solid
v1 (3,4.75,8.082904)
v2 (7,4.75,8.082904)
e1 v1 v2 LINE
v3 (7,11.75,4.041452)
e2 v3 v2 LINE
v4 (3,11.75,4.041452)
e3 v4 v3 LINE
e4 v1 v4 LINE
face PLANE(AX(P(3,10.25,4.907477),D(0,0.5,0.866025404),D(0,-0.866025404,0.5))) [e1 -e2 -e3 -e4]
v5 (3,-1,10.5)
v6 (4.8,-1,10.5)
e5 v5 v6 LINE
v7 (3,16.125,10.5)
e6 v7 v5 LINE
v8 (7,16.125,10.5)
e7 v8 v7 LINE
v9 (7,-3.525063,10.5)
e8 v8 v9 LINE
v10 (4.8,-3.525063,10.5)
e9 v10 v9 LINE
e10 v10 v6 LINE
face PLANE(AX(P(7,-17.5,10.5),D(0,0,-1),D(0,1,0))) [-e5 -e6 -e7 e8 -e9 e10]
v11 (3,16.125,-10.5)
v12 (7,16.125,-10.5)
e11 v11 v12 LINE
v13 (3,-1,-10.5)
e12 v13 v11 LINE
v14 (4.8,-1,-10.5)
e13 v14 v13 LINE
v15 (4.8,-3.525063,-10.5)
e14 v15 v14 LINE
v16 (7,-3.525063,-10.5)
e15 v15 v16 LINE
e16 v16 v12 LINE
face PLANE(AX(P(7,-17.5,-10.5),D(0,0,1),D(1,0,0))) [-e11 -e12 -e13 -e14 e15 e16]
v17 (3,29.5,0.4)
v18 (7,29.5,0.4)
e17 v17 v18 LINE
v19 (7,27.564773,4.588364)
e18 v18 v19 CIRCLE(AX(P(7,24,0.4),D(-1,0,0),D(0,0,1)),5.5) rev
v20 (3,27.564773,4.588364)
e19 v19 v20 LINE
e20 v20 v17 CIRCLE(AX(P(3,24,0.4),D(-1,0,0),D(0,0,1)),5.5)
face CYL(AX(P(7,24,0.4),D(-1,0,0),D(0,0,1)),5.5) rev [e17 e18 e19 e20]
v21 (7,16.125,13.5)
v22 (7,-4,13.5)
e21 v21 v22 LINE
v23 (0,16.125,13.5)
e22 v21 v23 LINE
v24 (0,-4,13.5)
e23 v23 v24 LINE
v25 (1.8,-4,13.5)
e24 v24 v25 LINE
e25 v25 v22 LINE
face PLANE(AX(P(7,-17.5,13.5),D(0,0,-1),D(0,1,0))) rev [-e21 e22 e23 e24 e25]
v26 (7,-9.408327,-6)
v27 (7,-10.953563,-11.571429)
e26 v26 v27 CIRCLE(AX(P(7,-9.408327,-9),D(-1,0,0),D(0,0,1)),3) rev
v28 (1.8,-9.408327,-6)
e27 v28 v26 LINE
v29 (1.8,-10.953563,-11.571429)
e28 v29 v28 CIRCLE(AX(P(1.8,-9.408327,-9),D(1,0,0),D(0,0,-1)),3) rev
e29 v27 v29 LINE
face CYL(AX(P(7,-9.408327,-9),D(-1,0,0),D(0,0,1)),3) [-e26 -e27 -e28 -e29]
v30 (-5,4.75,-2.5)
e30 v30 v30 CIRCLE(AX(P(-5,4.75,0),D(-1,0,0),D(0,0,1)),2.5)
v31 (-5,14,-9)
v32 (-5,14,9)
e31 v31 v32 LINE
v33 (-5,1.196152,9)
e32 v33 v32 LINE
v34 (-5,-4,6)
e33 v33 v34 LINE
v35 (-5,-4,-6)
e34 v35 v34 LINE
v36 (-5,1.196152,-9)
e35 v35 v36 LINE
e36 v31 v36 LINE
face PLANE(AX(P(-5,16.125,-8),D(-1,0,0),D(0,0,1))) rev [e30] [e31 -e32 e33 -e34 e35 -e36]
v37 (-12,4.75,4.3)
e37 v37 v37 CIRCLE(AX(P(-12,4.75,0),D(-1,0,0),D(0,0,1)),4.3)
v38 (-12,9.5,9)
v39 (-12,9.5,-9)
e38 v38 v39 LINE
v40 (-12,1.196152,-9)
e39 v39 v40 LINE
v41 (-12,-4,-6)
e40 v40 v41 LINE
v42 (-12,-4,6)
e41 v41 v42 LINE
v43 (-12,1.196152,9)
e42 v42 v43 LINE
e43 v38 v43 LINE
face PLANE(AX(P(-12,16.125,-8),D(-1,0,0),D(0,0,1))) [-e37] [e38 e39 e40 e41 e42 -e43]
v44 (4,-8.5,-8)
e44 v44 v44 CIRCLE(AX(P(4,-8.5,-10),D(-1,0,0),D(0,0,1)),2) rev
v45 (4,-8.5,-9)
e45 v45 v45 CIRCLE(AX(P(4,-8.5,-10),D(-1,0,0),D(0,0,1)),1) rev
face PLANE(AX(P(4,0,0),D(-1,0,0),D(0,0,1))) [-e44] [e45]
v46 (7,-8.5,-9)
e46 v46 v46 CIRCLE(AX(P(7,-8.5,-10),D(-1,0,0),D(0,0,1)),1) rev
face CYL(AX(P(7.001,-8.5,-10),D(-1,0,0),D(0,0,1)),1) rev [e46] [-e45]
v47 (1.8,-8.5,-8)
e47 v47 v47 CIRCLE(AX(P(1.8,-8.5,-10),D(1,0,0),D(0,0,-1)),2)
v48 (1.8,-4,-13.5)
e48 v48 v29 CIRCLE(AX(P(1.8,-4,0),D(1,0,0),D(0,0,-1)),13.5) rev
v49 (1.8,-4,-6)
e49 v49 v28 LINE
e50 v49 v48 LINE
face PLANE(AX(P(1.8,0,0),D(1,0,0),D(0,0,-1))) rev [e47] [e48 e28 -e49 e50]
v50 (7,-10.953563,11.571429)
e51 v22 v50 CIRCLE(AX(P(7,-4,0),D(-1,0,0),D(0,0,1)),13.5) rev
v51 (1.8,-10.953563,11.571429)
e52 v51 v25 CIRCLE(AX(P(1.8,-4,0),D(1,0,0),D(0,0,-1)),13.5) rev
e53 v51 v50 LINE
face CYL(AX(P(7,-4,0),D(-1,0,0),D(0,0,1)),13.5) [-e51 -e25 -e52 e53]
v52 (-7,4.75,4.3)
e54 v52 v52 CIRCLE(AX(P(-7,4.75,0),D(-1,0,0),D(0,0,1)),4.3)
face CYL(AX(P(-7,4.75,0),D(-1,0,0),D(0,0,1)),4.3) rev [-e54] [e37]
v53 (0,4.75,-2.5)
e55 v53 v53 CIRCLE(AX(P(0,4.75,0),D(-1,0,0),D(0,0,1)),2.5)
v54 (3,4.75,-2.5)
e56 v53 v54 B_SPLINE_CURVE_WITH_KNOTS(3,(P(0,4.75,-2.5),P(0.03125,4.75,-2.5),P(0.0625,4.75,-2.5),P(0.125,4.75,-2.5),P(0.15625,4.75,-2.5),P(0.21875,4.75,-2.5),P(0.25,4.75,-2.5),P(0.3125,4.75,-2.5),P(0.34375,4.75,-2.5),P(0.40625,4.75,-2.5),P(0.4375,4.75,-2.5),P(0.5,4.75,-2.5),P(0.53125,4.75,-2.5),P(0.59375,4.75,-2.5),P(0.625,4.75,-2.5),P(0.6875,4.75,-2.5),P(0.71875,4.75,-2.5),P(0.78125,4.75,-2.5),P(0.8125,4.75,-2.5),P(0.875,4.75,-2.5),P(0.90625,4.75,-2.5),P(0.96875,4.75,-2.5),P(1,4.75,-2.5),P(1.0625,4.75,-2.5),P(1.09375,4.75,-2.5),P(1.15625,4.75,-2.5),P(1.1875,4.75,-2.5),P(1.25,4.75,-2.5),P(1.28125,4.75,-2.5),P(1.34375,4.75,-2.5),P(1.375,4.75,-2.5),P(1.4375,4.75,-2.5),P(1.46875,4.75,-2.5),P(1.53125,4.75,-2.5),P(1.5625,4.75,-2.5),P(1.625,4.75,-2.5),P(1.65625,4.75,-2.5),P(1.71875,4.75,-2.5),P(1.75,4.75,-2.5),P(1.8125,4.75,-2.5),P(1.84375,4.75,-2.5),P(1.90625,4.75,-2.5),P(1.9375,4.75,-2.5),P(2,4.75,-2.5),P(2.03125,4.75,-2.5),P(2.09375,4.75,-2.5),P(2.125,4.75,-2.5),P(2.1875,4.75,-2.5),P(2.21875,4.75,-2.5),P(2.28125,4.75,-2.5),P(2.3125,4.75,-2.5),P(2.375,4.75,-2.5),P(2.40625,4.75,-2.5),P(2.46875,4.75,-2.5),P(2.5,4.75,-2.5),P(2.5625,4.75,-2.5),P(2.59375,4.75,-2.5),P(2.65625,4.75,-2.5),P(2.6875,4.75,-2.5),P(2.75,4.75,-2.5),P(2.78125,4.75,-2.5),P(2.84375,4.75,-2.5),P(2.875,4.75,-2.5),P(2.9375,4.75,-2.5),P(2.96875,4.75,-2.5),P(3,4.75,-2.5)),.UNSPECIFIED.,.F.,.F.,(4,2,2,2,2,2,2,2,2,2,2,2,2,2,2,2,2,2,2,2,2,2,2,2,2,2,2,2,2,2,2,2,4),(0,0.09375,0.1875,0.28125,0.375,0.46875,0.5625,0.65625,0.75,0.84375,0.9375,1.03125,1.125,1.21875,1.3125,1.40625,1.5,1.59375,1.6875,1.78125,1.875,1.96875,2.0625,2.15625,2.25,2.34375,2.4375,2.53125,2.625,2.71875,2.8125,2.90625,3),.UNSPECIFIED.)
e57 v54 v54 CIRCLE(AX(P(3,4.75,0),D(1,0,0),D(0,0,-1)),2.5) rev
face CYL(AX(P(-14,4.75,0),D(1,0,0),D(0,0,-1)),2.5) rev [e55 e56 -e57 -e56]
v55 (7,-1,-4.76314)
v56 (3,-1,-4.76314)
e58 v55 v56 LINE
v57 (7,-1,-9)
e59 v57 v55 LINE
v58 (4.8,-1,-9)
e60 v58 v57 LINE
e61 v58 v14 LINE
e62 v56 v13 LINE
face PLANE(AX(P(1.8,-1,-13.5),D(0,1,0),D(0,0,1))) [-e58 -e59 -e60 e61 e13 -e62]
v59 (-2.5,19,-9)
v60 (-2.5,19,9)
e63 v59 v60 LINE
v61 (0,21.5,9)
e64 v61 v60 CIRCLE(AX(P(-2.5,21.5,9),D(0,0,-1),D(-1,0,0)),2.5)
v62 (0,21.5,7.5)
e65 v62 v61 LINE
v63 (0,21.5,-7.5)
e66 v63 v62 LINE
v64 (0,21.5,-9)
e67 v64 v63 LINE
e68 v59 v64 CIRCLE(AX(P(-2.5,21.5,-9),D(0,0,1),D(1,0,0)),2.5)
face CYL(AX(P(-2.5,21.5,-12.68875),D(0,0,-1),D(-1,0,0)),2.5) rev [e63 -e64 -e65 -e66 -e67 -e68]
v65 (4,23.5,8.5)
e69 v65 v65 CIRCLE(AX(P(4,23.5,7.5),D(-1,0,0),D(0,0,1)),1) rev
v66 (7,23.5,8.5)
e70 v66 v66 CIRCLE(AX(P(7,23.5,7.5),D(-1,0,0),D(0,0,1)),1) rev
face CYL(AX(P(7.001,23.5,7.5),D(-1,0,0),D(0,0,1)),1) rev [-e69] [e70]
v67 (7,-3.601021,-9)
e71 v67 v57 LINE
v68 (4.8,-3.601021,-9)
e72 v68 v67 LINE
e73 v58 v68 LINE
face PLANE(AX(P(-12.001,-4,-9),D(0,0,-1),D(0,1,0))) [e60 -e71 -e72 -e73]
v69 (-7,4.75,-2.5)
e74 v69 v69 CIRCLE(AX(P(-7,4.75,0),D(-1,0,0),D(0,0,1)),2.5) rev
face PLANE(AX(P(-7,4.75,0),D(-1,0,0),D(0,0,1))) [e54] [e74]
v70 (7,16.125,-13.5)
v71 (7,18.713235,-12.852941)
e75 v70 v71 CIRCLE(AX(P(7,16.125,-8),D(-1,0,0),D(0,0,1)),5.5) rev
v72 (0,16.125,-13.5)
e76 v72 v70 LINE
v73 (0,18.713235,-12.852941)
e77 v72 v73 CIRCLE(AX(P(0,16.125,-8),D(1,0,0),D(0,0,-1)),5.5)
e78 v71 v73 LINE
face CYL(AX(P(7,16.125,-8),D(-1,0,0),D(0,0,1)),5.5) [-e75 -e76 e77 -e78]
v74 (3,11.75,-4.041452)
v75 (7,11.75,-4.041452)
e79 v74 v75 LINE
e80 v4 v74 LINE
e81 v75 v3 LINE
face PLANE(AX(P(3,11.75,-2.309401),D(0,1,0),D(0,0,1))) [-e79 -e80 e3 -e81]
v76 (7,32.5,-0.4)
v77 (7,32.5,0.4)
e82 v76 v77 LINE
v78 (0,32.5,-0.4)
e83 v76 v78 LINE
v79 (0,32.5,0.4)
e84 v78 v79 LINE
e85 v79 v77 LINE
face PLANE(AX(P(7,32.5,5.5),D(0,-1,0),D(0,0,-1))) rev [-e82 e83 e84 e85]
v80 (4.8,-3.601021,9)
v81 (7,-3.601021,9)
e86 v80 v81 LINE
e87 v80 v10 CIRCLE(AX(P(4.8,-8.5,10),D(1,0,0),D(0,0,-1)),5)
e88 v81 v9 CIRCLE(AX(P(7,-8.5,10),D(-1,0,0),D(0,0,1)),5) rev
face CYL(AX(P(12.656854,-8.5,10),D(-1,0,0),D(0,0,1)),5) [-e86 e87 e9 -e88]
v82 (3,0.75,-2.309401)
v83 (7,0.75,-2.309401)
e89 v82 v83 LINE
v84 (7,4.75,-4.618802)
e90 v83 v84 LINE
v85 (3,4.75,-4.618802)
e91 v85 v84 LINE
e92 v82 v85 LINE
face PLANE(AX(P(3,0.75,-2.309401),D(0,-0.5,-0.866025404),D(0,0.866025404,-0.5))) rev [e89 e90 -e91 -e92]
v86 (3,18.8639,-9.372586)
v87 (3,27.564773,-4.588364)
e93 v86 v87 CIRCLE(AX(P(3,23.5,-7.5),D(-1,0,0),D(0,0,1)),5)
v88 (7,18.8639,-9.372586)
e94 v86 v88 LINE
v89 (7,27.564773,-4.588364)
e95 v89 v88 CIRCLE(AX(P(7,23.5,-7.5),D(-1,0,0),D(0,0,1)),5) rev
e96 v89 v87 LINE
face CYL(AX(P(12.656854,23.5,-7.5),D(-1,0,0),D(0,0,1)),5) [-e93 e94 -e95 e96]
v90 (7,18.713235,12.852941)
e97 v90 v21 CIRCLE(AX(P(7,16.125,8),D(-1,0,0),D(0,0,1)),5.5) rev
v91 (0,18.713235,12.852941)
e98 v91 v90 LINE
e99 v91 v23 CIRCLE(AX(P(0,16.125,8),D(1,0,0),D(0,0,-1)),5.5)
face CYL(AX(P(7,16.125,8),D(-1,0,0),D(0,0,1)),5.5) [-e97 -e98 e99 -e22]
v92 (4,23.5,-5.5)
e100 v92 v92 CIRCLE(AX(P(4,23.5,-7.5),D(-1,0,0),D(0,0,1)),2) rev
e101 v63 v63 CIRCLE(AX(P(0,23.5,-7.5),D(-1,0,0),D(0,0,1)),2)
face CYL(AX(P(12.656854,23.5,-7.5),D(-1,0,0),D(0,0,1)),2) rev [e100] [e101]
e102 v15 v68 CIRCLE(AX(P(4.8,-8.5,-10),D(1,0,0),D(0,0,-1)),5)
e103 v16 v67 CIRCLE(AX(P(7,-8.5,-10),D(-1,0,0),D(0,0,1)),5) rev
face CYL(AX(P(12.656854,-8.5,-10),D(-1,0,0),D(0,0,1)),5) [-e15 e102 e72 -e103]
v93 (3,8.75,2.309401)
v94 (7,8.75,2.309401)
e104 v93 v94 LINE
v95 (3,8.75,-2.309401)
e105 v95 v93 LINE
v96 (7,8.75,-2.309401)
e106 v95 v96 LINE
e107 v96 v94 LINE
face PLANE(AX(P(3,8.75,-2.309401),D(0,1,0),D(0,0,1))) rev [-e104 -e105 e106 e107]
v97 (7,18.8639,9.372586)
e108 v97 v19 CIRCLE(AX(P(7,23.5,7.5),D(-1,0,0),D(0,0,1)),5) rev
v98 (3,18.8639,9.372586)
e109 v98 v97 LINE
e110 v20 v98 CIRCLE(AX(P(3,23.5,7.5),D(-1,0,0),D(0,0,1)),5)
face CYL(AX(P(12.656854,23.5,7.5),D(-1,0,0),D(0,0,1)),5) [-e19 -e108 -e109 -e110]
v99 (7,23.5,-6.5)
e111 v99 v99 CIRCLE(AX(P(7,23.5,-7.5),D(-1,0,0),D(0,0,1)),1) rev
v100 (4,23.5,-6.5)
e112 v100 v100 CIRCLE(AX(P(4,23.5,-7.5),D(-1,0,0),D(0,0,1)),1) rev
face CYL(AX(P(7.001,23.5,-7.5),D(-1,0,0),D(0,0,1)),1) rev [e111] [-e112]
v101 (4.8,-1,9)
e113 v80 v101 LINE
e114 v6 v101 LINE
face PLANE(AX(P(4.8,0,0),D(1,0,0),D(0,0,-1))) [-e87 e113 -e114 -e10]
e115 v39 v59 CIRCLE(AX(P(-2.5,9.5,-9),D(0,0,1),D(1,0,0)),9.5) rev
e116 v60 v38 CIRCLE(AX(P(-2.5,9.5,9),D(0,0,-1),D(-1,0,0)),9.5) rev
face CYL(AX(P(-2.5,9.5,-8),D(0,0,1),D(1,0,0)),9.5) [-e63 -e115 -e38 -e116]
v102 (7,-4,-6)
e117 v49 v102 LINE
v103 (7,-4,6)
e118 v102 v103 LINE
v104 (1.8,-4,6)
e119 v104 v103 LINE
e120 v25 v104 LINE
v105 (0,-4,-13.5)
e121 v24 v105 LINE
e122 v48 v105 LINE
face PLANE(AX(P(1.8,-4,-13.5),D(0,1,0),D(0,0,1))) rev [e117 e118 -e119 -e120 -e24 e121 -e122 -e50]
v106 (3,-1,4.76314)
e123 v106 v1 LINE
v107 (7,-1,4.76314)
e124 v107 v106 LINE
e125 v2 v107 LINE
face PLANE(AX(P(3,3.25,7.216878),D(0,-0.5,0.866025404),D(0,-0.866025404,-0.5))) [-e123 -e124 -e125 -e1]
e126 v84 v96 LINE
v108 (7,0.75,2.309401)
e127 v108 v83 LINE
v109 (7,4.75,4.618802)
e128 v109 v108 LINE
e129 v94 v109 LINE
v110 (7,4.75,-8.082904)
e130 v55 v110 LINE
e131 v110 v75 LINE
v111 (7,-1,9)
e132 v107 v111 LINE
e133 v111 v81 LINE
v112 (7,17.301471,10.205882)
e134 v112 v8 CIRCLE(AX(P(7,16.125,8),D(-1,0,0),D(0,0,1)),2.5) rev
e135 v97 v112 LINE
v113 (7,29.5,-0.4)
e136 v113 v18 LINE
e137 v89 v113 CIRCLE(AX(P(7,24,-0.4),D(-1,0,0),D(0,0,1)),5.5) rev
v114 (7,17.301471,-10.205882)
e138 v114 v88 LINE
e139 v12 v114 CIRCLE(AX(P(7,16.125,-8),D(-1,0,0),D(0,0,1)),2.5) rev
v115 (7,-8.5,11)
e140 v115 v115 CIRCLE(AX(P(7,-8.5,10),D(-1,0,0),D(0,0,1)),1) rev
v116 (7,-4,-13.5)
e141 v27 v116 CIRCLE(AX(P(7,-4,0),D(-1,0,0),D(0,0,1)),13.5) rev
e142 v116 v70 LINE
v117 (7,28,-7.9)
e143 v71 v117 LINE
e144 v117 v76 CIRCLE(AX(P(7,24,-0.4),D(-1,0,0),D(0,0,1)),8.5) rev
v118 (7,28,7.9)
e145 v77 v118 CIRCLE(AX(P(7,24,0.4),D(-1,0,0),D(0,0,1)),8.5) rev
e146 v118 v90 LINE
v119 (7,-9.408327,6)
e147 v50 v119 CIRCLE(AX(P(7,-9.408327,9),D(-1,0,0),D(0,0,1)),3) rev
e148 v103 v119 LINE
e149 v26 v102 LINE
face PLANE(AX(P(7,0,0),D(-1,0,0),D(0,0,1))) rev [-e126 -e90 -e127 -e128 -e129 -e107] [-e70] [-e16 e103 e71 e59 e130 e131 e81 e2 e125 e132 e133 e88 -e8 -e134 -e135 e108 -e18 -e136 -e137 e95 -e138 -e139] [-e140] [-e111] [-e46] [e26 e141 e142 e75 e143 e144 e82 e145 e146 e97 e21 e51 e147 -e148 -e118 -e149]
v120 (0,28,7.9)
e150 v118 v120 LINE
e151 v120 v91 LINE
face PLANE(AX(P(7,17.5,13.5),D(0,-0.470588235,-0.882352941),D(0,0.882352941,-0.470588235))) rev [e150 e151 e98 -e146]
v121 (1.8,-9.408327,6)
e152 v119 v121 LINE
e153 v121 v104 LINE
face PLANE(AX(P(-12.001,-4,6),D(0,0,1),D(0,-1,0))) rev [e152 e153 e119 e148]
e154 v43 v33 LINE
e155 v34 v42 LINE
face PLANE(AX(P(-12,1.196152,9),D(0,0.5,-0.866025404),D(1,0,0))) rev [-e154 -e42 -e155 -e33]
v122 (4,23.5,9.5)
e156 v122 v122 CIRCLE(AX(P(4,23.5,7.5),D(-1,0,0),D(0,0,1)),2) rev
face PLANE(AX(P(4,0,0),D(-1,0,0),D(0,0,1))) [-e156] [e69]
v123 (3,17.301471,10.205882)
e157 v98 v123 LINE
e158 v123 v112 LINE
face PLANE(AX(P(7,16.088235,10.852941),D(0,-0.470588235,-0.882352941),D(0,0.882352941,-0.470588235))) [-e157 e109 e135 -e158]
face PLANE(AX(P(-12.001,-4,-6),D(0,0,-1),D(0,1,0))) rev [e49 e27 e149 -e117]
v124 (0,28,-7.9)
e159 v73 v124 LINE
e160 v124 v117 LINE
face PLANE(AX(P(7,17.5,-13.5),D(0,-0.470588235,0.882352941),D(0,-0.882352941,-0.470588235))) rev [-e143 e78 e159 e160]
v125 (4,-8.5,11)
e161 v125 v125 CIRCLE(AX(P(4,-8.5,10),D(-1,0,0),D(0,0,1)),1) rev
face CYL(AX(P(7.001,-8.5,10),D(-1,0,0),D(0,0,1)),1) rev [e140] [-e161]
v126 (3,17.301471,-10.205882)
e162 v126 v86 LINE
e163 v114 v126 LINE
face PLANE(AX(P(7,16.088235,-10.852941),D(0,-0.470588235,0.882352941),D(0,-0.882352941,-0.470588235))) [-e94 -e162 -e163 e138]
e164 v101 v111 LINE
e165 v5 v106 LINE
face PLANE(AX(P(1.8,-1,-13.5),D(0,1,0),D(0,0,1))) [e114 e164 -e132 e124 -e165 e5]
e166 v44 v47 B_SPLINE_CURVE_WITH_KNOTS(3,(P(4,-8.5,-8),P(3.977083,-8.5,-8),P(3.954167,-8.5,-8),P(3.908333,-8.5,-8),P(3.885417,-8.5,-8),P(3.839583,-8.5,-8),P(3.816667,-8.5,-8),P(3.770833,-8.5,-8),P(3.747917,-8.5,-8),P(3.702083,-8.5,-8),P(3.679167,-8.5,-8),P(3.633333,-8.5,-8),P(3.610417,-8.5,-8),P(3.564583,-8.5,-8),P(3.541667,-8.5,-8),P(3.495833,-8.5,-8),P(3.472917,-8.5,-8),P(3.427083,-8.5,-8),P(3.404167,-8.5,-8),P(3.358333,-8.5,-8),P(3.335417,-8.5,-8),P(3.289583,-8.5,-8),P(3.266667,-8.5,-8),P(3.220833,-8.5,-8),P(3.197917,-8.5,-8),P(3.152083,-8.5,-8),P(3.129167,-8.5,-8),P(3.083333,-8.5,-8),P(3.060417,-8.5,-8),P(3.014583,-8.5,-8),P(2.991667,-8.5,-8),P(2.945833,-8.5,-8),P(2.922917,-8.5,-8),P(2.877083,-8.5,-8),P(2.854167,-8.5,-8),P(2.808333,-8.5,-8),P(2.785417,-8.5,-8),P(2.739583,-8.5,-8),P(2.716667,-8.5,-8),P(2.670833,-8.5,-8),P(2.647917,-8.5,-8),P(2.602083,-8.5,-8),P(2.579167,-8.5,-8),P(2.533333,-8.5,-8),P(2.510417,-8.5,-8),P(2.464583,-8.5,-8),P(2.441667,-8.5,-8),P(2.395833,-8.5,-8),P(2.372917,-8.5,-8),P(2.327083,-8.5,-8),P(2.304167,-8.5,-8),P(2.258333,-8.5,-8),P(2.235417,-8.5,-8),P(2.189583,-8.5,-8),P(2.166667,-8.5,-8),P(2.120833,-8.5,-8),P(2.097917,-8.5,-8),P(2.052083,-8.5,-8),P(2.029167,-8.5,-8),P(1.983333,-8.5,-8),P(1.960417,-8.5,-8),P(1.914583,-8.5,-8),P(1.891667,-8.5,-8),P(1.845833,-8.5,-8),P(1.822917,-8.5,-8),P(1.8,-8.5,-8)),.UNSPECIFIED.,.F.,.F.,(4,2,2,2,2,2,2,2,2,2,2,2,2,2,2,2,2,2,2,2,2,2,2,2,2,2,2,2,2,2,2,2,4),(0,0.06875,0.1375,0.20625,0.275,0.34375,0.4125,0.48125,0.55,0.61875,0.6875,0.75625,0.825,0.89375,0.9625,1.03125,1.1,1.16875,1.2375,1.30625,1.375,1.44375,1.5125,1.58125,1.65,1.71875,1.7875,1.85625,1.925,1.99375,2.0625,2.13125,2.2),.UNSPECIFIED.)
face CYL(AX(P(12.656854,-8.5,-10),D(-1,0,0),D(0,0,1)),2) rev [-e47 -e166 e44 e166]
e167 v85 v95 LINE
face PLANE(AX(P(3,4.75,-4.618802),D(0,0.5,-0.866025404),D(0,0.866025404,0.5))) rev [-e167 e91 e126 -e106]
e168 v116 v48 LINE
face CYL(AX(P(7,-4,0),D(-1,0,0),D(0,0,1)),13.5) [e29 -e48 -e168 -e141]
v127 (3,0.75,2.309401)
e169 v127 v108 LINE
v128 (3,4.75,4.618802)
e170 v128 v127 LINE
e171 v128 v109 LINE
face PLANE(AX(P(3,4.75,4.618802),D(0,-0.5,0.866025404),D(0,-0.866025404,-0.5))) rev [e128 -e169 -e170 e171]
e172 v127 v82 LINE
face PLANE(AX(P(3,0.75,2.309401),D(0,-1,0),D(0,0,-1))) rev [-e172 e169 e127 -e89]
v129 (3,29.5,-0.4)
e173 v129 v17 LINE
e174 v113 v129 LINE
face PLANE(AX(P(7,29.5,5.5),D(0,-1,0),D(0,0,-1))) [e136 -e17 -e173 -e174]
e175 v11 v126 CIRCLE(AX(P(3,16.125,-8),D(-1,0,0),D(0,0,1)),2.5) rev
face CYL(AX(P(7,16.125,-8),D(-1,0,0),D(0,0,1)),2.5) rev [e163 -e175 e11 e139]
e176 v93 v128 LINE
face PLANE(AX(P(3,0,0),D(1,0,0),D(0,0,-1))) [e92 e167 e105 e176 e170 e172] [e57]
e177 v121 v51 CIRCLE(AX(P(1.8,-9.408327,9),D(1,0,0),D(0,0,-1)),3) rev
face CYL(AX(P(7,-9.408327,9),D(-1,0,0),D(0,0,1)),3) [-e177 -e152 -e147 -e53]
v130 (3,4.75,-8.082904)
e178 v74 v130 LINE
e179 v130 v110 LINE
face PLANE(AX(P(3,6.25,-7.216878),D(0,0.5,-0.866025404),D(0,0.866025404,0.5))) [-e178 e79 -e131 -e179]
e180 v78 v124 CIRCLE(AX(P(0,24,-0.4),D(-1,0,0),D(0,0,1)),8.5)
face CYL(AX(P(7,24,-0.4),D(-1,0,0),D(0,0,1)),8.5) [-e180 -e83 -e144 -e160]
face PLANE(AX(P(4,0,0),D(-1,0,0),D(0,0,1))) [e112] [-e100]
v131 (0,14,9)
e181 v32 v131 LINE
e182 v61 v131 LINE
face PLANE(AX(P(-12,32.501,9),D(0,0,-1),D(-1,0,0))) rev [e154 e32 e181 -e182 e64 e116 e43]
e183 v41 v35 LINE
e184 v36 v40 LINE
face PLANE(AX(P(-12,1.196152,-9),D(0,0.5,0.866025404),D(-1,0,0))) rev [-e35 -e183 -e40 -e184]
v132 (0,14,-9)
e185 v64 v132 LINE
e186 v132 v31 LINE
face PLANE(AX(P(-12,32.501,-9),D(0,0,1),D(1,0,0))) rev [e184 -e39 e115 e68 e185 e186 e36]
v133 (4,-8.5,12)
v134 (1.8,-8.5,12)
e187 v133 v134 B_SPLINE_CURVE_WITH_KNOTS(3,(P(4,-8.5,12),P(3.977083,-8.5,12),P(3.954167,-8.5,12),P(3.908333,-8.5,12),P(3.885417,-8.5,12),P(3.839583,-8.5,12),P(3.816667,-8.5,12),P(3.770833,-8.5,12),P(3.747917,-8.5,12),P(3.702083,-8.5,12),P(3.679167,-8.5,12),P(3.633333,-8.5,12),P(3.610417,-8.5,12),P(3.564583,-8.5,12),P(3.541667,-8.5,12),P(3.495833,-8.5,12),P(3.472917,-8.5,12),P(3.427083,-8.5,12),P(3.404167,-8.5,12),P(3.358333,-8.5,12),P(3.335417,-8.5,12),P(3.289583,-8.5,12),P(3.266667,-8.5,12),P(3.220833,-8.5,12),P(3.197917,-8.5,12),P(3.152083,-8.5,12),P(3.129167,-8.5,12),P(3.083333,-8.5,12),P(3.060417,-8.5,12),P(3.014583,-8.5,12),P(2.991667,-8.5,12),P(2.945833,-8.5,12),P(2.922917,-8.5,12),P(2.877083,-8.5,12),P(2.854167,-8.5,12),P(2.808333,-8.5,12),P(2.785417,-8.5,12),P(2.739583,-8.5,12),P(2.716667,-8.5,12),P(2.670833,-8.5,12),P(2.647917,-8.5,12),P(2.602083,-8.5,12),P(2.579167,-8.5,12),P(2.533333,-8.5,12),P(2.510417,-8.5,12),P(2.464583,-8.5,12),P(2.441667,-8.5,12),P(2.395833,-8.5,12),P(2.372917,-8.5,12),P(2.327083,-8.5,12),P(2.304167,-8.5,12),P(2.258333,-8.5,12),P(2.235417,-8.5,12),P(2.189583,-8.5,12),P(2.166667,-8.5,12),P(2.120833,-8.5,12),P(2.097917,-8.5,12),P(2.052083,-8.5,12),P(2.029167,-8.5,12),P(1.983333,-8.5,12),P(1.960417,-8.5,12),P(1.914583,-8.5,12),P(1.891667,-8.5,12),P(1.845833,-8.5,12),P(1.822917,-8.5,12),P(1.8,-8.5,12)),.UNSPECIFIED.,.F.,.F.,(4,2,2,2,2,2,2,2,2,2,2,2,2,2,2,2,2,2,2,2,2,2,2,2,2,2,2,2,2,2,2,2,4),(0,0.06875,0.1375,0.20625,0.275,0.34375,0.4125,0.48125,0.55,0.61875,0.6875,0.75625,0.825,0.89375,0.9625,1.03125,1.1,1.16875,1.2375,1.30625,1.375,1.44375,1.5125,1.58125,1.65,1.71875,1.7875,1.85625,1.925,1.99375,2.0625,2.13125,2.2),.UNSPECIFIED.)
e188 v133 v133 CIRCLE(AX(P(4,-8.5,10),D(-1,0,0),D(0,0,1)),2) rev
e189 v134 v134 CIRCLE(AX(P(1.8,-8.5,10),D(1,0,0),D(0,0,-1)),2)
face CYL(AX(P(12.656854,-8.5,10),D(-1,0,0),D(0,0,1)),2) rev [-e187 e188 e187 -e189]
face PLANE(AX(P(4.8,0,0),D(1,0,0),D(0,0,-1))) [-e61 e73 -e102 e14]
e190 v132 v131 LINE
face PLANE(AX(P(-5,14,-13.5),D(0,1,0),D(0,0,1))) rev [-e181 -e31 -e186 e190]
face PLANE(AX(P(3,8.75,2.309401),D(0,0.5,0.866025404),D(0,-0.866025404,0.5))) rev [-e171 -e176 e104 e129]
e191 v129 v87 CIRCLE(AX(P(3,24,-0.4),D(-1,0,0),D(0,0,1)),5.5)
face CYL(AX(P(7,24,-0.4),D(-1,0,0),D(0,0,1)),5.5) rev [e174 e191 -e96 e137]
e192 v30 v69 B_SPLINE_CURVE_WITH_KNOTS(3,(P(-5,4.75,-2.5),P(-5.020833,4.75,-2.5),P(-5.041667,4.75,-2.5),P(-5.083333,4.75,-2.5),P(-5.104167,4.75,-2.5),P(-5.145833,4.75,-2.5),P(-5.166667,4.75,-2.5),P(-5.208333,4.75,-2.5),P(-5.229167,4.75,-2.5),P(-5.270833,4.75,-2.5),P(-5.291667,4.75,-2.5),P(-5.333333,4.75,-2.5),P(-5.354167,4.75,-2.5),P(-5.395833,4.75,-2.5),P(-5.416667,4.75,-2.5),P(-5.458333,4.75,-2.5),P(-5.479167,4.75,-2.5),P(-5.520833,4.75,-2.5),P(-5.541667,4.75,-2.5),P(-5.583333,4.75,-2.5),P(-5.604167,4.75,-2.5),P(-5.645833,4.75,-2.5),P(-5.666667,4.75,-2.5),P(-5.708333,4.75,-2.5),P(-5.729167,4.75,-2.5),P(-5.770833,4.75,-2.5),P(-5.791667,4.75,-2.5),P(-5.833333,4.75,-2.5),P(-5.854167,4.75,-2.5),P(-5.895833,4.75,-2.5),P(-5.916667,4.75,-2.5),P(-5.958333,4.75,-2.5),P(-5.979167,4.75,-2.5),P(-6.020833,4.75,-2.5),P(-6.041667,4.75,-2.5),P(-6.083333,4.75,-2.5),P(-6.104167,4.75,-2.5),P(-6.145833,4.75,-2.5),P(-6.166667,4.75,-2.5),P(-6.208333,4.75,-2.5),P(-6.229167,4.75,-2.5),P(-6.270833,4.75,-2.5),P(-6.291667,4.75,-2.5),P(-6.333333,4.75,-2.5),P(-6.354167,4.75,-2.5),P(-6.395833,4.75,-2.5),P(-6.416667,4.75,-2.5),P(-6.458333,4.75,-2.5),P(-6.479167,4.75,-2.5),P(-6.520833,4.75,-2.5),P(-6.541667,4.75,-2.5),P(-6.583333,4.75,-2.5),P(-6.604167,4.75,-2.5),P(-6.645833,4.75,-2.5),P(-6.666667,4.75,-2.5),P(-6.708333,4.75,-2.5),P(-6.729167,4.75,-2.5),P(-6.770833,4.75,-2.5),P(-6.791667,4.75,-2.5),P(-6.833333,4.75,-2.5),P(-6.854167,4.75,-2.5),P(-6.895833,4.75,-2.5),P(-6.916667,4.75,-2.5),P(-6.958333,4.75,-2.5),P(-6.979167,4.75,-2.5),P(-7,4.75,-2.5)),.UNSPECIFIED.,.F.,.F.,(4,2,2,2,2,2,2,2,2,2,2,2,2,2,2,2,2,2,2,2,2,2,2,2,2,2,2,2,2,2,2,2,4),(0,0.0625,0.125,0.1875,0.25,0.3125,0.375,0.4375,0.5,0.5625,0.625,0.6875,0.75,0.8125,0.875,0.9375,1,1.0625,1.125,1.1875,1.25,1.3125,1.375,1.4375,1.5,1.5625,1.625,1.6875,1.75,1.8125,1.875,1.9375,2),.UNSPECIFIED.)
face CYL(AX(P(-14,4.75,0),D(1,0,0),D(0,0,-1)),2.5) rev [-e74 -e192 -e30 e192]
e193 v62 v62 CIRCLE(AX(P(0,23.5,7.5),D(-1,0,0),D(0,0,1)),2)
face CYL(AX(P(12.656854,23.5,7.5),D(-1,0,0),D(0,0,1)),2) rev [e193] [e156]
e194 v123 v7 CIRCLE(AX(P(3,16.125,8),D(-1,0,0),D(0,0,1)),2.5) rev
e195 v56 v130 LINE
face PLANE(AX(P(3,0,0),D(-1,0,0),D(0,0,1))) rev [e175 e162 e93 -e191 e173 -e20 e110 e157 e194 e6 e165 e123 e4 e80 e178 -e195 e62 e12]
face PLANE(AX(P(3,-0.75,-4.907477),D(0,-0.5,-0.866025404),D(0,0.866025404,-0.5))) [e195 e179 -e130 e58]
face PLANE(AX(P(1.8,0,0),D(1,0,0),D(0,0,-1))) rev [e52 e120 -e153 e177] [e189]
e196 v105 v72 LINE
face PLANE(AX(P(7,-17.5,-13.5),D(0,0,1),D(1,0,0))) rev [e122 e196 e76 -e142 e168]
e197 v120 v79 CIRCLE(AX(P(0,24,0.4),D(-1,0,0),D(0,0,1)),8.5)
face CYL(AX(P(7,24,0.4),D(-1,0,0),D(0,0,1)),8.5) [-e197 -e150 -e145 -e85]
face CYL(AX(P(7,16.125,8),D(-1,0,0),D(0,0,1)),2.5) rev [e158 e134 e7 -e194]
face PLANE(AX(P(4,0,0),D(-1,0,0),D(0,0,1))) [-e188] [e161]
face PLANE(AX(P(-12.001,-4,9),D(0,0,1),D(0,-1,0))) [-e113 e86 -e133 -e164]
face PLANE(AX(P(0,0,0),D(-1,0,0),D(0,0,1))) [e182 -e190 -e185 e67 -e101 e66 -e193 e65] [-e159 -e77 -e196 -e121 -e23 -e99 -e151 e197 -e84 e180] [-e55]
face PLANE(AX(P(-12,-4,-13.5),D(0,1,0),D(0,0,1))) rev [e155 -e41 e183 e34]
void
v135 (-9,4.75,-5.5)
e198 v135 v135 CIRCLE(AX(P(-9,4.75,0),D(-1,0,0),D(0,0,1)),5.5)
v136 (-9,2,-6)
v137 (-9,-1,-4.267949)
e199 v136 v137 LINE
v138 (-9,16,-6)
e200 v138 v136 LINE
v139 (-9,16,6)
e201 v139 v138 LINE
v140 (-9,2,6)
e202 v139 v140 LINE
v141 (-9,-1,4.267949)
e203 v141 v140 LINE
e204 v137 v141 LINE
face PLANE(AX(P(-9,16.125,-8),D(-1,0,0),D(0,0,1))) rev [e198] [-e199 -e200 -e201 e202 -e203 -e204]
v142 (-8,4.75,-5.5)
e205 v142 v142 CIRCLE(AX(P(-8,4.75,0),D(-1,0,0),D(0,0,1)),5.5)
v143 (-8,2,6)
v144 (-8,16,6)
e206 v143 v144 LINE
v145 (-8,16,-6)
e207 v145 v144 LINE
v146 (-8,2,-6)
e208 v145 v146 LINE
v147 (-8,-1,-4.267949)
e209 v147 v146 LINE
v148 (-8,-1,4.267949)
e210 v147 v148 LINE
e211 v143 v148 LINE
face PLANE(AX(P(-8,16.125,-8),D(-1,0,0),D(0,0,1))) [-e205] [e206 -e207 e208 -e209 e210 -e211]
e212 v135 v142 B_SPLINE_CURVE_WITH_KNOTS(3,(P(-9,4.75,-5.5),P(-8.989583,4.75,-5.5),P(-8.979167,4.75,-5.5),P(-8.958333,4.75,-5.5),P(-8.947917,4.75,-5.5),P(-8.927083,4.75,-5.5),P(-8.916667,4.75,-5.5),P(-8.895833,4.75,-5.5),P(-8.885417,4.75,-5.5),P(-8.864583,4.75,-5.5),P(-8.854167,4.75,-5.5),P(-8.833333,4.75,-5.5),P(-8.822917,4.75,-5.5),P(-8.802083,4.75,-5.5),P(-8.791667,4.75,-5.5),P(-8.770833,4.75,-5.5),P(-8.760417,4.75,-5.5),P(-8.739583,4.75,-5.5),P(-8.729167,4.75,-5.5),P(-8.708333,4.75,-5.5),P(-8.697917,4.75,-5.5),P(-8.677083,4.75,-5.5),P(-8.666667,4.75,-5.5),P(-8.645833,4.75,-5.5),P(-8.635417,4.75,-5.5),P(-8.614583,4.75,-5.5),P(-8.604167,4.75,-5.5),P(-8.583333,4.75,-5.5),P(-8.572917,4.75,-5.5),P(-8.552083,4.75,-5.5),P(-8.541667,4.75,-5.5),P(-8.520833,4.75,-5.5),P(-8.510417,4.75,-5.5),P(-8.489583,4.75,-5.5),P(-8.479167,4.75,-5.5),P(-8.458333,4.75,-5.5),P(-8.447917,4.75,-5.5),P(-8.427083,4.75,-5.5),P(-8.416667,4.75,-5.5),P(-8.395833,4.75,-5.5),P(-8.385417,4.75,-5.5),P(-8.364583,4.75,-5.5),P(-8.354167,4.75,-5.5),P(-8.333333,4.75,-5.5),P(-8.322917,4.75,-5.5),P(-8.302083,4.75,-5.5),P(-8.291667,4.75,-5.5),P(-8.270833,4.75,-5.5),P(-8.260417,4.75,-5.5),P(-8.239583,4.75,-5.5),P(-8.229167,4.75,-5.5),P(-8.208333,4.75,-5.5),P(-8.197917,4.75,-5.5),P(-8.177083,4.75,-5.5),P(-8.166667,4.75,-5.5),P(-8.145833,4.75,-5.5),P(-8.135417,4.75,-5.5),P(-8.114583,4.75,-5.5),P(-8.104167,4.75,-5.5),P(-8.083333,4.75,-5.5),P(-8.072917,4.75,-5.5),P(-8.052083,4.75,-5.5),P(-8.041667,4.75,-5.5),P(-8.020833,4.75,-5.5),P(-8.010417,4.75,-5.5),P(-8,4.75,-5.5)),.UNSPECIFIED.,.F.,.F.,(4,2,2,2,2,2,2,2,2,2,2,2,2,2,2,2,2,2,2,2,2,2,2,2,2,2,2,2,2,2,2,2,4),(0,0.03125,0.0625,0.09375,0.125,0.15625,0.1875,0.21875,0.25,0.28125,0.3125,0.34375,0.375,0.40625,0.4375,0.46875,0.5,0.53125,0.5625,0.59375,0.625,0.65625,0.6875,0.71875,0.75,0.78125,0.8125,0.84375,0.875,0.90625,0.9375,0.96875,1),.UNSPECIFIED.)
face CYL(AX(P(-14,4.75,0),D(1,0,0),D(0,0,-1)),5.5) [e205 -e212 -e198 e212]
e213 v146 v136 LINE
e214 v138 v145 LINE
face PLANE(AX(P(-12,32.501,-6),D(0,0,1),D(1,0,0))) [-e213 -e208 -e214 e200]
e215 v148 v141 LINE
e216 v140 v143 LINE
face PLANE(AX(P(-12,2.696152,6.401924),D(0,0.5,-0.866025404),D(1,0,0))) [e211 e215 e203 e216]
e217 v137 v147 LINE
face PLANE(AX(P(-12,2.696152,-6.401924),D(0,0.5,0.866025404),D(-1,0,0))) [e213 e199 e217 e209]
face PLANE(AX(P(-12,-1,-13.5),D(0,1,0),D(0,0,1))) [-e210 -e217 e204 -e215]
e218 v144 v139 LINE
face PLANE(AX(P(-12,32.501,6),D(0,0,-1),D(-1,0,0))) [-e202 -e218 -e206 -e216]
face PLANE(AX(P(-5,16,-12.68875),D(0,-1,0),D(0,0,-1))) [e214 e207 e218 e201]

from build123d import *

# Parameters (mm, degrees)
BOSS_EXTRUDE1_DEPTH = 7
FILLET1_R           = 8.5
FILLET2_R           = 5.5
FILLET3_R           = 13.5
SKETCH3_W           = 27
SKETCH3_H           = 13.5
CUT_EXTRUDE1_DEPTH  = 1.8
BOSS_EXTRUDE2_DEPTH = 5
BOSS_EXTRUDE3_DEPTH = 7
SKETCH10_R          = 2.5
CUT_EXTRUDE3_DEPTH  = 21
CUT_EXTRUDE5_REACH  = 41.994
SKETCH12_W          = 12
SKETCH12_H          = 13.5
CUT_EXTRUDE6_REACH  = 39.182
SKETCH13_R          = 1
SKETCH17_R          = 2
CUT_EXTRUDE14_DEPTH = 4
FILLET4_R           = 3
CUT_EXTRUDE16_REACH = 42.725
SKETCH19_W          = 12
SKETCH19_H          = 4.5
CHAMFER5_SIZE       = 3
CHAMFER5_SIZE2      = 5.196152423
CUT_EXTRUDE17_DEPTH = 4
SHELL1_START        = 3
SHELL1_DEPTH        = 4
SHELL1_START_2      = -9
SHELL1_2_OUTLINE_R  = 5.5
SHELL1_2_DEPTH      = 1
SHELL1_START_3      = 4.8
SHELL1_3_DEPTH      = 2.2
SKETCH21_R          = 4.3
CUT_EXTRUDE18_DEPTH = 5
FILLET5_R           = 9.5
FILLET6_R           = 2.5


# Read off the part's stored shape, not the designer's step: Shell1
with BuildPart() as part:
    # Sketch2 → Boss-Extrude1 (new body)
    with BuildSketch(Plane(origin=(0, 0, 0), x_dir=(0, 0, -1), z_dir=(1, 0, 0))):
        Polygon((-13.5, -17.5), (13.5, -17.5), (13.5, 17.5), (5.5, 32.5), (-5.5, 32.5), (-13.5, 17.5), align=None)
    extrude(amount=BOSS_EXTRUDE1_DEPTH)

    # Fillet1
    fillet1_edges = [part.edges().sort_by_distance(p)[0] for p in [
        (3.5, 32.5, 5.5),
        (3.5, 32.5, -5.5),
    ]]
    fillet(fillet1_edges, radius=FILLET1_R)

    # Fillet2
    fillet2_edges = [part.edges().sort_by_distance(p)[0] for p in [
        (3.5, 17.5, -13.5),
        (3.5, 17.5, 13.5),
    ]]
    fillet(fillet2_edges, radius=FILLET2_R)

    # Fillet3
    fillet3_edges = [part.edges().sort_by_distance(p)[0] for p in [
        (3.5, -17.5, 13.5),
        (3.5, -17.5, -13.5),
    ]]
    fillet(fillet3_edges, radius=FILLET3_R - 0.0001)  # a hair under: the kernel refuses the full size

    # Sketch3 → Cut-Extrude1 (cut)
    with BuildSketch(Plane.ZY):
        with Locations((0, -10.75)):
            Rectangle(SKETCH3_W, SKETCH3_H)
    extrude(amount=-CUT_EXTRUDE1_DEPTH, mode=Mode.SUBTRACT)

    # Sketch6 → Boss-Extrude2 (add)
    with BuildSketch(Plane.ZY):
        with BuildLine():
            Line((-13.5, 14), (13.5, 14))
            Line((13.5, 14), (13.5, 16.125))
            ThreePointArc((13.5, 16.125), (13.293303509, 17.618632471), (12.688749833, 19))
            Line((12.688749833, 19), (-12.688749833, 19))
            ThreePointArc((-12.688749833, 19), (-13.293303509, 17.618632471), (-13.5, 16.125))
            Line((-13.5, 16.125), (-13.5, 14))
        make_face()
    extrude(amount=BOSS_EXTRUDE2_DEPTH)

    # Sketch9 → Boss-Extrude3 (add)
    with BuildSketch(Plane.ZY.offset(5)):
        with BuildLine():
            Line((-13.5, 14), (-13.5, -4))
            Line((-13.5, -4), (13.5, -4))
            Line((13.5, -4), (13.5, 14))
            Line((13.5, 14), (13.5, 16.125))
            ThreePointArc((13.5, 16.125), (13.293303509, 17.618632471), (12.688749833, 19))
            Line((12.688749833, 19), (-12.688749833, 19))
            ThreePointArc((-12.688749833, 19), (-13.293303509, 17.618632471), (-13.5, 16.125))
            Line((-13.5, 16.125), (-13.5, 14))
        make_face()
    extrude(amount=BOSS_EXTRUDE3_DEPTH)

    # Sketch10 → Cut-Extrude3 (cut)
    with BuildSketch(Plane(origin=(7, 0, 0), x_dir=(0, 0, -1), z_dir=(1, 0, 0))):
        with Locations((0, 4.75)):
            Circle(SKETCH10_R)
    extrude(amount=-CUT_EXTRUDE3_DEPTH, mode=Mode.SUBTRACT)

    # Sketch12 → Cut-Extrude5 (cut, up to next)
    with BuildSketch(Plane(origin=(7, 0, 0), x_dir=(0, 0, -1), z_dir=(1, 0, 0)), mode=Mode.PRIVATE) as cut_extrude5_sk1:
        with Locations((0, -10.75)):
            Rectangle(SKETCH12_W, SKETCH12_H)
    cut_extrude5_tool1 = extrude(cut_extrude5_sk1.sketch, amount=-CUT_EXTRUDE5_REACH, mode=Mode.PRIVATE) & part.part
    add(cut_extrude5_tool1.solids().sort_by_distance((7, -10.75, 0))[0], mode=Mode.SUBTRACT)

    # Sketch13 → Cut-Extrude6 (cut, up to next)
    with BuildSketch(Plane.ZY, mode=Mode.PRIVATE) as cut_extrude6_sk1:
        with Locations((-7.5, 23.5)):
            Circle(SKETCH13_R)
    cut_extrude6_tool1 = extrude(cut_extrude6_sk1.sketch, amount=-CUT_EXTRUDE6_REACH, mode=Mode.PRIVATE) & part.part
    # Sketch13 → Cut-Extrude6 (cut, up to next)
    with BuildSketch(Plane.ZY, mode=Mode.PRIVATE) as cut_extrude6_sk2:
        with Locations((-10, -8.5)):
            Circle(SKETCH13_R)
    cut_extrude6_tool2 = extrude(cut_extrude6_sk2.sketch, amount=-CUT_EXTRUDE6_REACH, mode=Mode.PRIVATE) & part.part
    # Sketch13 → Cut-Extrude6 (cut, up to next)
    with BuildSketch(Plane.ZY, mode=Mode.PRIVATE) as cut_extrude6_sk3:
        with Locations((10, -8.5)):
            Circle(SKETCH13_R)
    cut_extrude6_tool3 = extrude(cut_extrude6_sk3.sketch, amount=-CUT_EXTRUDE6_REACH, mode=Mode.PRIVATE) & part.part
    # Sketch13 → Cut-Extrude6 (cut, up to next)
    with BuildSketch(Plane.ZY, mode=Mode.PRIVATE) as cut_extrude6_sk4:
        with Locations((7.5, 23.5)):
            Circle(SKETCH13_R)
    cut_extrude6_tool4 = extrude(cut_extrude6_sk4.sketch, amount=-CUT_EXTRUDE6_REACH, mode=Mode.PRIVATE) & part.part
    add(cut_extrude6_tool1.solids().sort_by_distance((0, 23.5, -7.5))[0], mode=Mode.SUBTRACT)
    add(cut_extrude6_tool2.solids().sort_by_distance((0, -8.5, -10))[0], mode=Mode.SUBTRACT)
    add(cut_extrude6_tool3.solids().sort_by_distance((0, -8.5, 10))[0], mode=Mode.SUBTRACT)
    add(cut_extrude6_tool4.solids().sort_by_distance((0, 23.5, 7.5))[0], mode=Mode.SUBTRACT)

    # Sketch17 → Cut-Extrude14 (cut)
    with BuildSketch(Plane.ZY):
        with Locations((-7.5, 23.5)):
            Circle(SKETCH17_R)
        with Locations((7.5, 23.5)):
            Circle(SKETCH17_R)
        with Locations((-10, -8.5)):
            Circle(SKETCH17_R)
        with Locations((10, -8.5)):
            Circle(SKETCH17_R)
    extrude(amount=-CUT_EXTRUDE14_DEPTH, mode=Mode.SUBTRACT)

    # Fillet4
    fillet4_edges = [part.edges().sort_by_distance(p)[0] for p in [
        (4.4, -16.093424605, -6),
        (4.4, -16.093424605, 6),
    ]]
    fillet(fillet4_edges, radius=FILLET4_R)

    # Sketch19 → Cut-Extrude16 (cut, up to next)
    with BuildSketch(Plane.XZ.offset(4), mode=Mode.PRIVATE) as cut_extrude16_sk1:
        with Locations((-6, -11.25)):
            Rectangle(SKETCH19_W, SKETCH19_H)
    cut_extrude16_tool1 = extrude(cut_extrude16_sk1.sketch, amount=-CUT_EXTRUDE16_REACH, mode=Mode.PRIVATE) & part.part
    # Sketch19 → Cut-Extrude16 (cut, up to next)
    with BuildSketch(Plane.XZ.offset(4), mode=Mode.PRIVATE) as cut_extrude16_sk2:
        with Locations((-6, 11.25)):
            Rectangle(SKETCH19_W, SKETCH19_H)
    cut_extrude16_tool2 = extrude(cut_extrude16_sk2.sketch, amount=-CUT_EXTRUDE16_REACH, mode=Mode.PRIVATE) & part.part
    add(cut_extrude16_tool1.solids().sort_by_distance((-6, -4, -11.25))[0], mode=Mode.SUBTRACT)
    add(cut_extrude16_tool2.solids().sort_by_distance((-6, -4, 11.25))[0], mode=Mode.SUBTRACT)

    # Chamfer5
    chamfer5_edges = [part.edges().sort_by_distance(p)[0] for p in [
        (-8.5, -4, -9),
        (-8.5, -4, 9),
    ]]
    chamfer5_side = [part.faces().sort_by_distance(p)[0] for p in [
        (-8.5, -4, 0),
    ]]
    chamfer(chamfer5_edges, length=CHAMFER5_SIZE, length2=CHAMFER5_SIZE2, reference=chamfer5_side[0])

    # Sketch20 → Cut-Extrude17 (cut)
    with BuildSketch(Plane(origin=(7, 0, 0), x_dir=(0, 0, -1), z_dir=(1, 0, 0))):
        Polygon((2.309401077, 8.75), (-2.309401077, 8.75), (-4.618802154, 4.75), (-2.309401077, 0.75), (2.309401077, 0.75), (4.618802154, 4.75), align=None)
    extrude(amount=-CUT_EXTRUDE17_DEPTH, mode=Mode.SUBTRACT)

    # Shell1 outline → Shell1 (cut)
    with BuildSketch(Plane.YZ.offset(SHELL1_START)):
        with BuildLine():
            Line((4.75, 8.082903769), (11.75, 4.041451884))
            Line((11.75, 4.041451884), (11.75, -4.041451884))
            Line((11.75, -4.041451884), (4.75, -8.082903769))
            Line((4.75, -8.082903769), (-1, -4.763139721))
            Line((-1, -4.763139721), (-1, -10.5))
            Line((-1, -10.5), (16.125, -10.5))
            ThreePointArc((16.125, -10.5), (16.731339062, -10.42535625), (17.301470588, -10.205882353))
            Line((17.301470588, -10.205882353), (18.863900358, -9.372586476))
            ThreePointArc((18.863900358, -9.372586476), (21.090892464, -3.118653074), (27.564772739, -4.588364277))
            ThreePointArc((27.564772739, -4.588364277), (28.99280733, -2.706918934), (29.5, -0.4))
            Line((29.5, -0.4), (29.5, 0.4))
            ThreePointArc((29.5, 0.4), (28.99280733, 2.706918934), (27.564772739, 4.588364277))
            ThreePointArc((27.564772739, 4.588364277), (21.090892464, 3.118653074), (18.863900358, 9.372586476))
            Line((18.863900358, 9.372586476), (17.301470588, 10.205882353))
            ThreePointArc((17.301470588, 10.205882353), (16.731339062, 10.42535625), (16.125, 10.5))
            Line((16.125, 10.5), (-1, 10.5))
            Line((-1, 10.5), (-1, 4.763139721))
            Line((-1, 4.763139721), (4.75, 8.082903769))
        make_face()
    extrude(amount=SHELL1_DEPTH, mode=Mode.SUBTRACT)

    # Shell1 2 outline → Shell1 2 (cut)
    with BuildSketch(Plane.YZ.offset(SHELL1_START_2)):
        Polygon((16, -6), (16, 6), (2, 6), (-1, 4.267949192), (-1, -4.267949192), (2, -6), align=None)
        with Locations((4.75, 0)):
            Circle(SHELL1_2_OUTLINE_R, mode=Mode.SUBTRACT)
    extrude(amount=SHELL1_2_DEPTH, mode=Mode.SUBTRACT)

    # Shell1 3 outline → Shell1 3 (cut)
    with BuildSketch(Plane.YZ.offset(SHELL1_START_3)):
        with BuildLine():
            Line((-1, -10.5), (-1, -9))
            Line((-1, -9), (-3.601020514, -9))
            ThreePointArc((-3.601020514, -9), (-3.506398333, -9.747131669), (-3.525062814, -10.5))
            Line((-3.525062814, -10.5), (-1, -10.5))
        make_face()
        with BuildLine():
            Line((-3.601020514, 9), (-1, 9))
            Line((-1, 9), (-1, 10.5))
            Line((-1, 10.5), (-3.525062814, 10.5))
            ThreePointArc((-3.525062814, 10.5), (-3.506398333, 9.747131669), (-3.601020514, 9))
        make_face()
    extrude(amount=SHELL1_3_DEPTH, mode=Mode.SUBTRACT)

    # Sketch21 → Cut-Extrude18 (cut)
    with BuildSketch(Plane.ZY.offset(12)):
        with Locations((0, 4.75)):
            Circle(SKETCH21_R)
    extrude(amount=-CUT_EXTRUDE18_DEPTH, mode=Mode.SUBTRACT)

    # Fillet5
    fillet5_edges = [part.edges().sort_by_distance(p)[0] for p in [
        (-12, 19, 0),
    ]]
    fillet(fillet5_edges, radius=FILLET5_R)

    # Fillet6
    fillet6_edges = [part.edges().sort_by_distance(p)[0] for p in [
        (0, 19, 0),
    ]]
    fillet(fillet6_edges, radius=FILLET6_R - 0.0001)  # a hair under: the kernel refuses the full size


solid = part.part
